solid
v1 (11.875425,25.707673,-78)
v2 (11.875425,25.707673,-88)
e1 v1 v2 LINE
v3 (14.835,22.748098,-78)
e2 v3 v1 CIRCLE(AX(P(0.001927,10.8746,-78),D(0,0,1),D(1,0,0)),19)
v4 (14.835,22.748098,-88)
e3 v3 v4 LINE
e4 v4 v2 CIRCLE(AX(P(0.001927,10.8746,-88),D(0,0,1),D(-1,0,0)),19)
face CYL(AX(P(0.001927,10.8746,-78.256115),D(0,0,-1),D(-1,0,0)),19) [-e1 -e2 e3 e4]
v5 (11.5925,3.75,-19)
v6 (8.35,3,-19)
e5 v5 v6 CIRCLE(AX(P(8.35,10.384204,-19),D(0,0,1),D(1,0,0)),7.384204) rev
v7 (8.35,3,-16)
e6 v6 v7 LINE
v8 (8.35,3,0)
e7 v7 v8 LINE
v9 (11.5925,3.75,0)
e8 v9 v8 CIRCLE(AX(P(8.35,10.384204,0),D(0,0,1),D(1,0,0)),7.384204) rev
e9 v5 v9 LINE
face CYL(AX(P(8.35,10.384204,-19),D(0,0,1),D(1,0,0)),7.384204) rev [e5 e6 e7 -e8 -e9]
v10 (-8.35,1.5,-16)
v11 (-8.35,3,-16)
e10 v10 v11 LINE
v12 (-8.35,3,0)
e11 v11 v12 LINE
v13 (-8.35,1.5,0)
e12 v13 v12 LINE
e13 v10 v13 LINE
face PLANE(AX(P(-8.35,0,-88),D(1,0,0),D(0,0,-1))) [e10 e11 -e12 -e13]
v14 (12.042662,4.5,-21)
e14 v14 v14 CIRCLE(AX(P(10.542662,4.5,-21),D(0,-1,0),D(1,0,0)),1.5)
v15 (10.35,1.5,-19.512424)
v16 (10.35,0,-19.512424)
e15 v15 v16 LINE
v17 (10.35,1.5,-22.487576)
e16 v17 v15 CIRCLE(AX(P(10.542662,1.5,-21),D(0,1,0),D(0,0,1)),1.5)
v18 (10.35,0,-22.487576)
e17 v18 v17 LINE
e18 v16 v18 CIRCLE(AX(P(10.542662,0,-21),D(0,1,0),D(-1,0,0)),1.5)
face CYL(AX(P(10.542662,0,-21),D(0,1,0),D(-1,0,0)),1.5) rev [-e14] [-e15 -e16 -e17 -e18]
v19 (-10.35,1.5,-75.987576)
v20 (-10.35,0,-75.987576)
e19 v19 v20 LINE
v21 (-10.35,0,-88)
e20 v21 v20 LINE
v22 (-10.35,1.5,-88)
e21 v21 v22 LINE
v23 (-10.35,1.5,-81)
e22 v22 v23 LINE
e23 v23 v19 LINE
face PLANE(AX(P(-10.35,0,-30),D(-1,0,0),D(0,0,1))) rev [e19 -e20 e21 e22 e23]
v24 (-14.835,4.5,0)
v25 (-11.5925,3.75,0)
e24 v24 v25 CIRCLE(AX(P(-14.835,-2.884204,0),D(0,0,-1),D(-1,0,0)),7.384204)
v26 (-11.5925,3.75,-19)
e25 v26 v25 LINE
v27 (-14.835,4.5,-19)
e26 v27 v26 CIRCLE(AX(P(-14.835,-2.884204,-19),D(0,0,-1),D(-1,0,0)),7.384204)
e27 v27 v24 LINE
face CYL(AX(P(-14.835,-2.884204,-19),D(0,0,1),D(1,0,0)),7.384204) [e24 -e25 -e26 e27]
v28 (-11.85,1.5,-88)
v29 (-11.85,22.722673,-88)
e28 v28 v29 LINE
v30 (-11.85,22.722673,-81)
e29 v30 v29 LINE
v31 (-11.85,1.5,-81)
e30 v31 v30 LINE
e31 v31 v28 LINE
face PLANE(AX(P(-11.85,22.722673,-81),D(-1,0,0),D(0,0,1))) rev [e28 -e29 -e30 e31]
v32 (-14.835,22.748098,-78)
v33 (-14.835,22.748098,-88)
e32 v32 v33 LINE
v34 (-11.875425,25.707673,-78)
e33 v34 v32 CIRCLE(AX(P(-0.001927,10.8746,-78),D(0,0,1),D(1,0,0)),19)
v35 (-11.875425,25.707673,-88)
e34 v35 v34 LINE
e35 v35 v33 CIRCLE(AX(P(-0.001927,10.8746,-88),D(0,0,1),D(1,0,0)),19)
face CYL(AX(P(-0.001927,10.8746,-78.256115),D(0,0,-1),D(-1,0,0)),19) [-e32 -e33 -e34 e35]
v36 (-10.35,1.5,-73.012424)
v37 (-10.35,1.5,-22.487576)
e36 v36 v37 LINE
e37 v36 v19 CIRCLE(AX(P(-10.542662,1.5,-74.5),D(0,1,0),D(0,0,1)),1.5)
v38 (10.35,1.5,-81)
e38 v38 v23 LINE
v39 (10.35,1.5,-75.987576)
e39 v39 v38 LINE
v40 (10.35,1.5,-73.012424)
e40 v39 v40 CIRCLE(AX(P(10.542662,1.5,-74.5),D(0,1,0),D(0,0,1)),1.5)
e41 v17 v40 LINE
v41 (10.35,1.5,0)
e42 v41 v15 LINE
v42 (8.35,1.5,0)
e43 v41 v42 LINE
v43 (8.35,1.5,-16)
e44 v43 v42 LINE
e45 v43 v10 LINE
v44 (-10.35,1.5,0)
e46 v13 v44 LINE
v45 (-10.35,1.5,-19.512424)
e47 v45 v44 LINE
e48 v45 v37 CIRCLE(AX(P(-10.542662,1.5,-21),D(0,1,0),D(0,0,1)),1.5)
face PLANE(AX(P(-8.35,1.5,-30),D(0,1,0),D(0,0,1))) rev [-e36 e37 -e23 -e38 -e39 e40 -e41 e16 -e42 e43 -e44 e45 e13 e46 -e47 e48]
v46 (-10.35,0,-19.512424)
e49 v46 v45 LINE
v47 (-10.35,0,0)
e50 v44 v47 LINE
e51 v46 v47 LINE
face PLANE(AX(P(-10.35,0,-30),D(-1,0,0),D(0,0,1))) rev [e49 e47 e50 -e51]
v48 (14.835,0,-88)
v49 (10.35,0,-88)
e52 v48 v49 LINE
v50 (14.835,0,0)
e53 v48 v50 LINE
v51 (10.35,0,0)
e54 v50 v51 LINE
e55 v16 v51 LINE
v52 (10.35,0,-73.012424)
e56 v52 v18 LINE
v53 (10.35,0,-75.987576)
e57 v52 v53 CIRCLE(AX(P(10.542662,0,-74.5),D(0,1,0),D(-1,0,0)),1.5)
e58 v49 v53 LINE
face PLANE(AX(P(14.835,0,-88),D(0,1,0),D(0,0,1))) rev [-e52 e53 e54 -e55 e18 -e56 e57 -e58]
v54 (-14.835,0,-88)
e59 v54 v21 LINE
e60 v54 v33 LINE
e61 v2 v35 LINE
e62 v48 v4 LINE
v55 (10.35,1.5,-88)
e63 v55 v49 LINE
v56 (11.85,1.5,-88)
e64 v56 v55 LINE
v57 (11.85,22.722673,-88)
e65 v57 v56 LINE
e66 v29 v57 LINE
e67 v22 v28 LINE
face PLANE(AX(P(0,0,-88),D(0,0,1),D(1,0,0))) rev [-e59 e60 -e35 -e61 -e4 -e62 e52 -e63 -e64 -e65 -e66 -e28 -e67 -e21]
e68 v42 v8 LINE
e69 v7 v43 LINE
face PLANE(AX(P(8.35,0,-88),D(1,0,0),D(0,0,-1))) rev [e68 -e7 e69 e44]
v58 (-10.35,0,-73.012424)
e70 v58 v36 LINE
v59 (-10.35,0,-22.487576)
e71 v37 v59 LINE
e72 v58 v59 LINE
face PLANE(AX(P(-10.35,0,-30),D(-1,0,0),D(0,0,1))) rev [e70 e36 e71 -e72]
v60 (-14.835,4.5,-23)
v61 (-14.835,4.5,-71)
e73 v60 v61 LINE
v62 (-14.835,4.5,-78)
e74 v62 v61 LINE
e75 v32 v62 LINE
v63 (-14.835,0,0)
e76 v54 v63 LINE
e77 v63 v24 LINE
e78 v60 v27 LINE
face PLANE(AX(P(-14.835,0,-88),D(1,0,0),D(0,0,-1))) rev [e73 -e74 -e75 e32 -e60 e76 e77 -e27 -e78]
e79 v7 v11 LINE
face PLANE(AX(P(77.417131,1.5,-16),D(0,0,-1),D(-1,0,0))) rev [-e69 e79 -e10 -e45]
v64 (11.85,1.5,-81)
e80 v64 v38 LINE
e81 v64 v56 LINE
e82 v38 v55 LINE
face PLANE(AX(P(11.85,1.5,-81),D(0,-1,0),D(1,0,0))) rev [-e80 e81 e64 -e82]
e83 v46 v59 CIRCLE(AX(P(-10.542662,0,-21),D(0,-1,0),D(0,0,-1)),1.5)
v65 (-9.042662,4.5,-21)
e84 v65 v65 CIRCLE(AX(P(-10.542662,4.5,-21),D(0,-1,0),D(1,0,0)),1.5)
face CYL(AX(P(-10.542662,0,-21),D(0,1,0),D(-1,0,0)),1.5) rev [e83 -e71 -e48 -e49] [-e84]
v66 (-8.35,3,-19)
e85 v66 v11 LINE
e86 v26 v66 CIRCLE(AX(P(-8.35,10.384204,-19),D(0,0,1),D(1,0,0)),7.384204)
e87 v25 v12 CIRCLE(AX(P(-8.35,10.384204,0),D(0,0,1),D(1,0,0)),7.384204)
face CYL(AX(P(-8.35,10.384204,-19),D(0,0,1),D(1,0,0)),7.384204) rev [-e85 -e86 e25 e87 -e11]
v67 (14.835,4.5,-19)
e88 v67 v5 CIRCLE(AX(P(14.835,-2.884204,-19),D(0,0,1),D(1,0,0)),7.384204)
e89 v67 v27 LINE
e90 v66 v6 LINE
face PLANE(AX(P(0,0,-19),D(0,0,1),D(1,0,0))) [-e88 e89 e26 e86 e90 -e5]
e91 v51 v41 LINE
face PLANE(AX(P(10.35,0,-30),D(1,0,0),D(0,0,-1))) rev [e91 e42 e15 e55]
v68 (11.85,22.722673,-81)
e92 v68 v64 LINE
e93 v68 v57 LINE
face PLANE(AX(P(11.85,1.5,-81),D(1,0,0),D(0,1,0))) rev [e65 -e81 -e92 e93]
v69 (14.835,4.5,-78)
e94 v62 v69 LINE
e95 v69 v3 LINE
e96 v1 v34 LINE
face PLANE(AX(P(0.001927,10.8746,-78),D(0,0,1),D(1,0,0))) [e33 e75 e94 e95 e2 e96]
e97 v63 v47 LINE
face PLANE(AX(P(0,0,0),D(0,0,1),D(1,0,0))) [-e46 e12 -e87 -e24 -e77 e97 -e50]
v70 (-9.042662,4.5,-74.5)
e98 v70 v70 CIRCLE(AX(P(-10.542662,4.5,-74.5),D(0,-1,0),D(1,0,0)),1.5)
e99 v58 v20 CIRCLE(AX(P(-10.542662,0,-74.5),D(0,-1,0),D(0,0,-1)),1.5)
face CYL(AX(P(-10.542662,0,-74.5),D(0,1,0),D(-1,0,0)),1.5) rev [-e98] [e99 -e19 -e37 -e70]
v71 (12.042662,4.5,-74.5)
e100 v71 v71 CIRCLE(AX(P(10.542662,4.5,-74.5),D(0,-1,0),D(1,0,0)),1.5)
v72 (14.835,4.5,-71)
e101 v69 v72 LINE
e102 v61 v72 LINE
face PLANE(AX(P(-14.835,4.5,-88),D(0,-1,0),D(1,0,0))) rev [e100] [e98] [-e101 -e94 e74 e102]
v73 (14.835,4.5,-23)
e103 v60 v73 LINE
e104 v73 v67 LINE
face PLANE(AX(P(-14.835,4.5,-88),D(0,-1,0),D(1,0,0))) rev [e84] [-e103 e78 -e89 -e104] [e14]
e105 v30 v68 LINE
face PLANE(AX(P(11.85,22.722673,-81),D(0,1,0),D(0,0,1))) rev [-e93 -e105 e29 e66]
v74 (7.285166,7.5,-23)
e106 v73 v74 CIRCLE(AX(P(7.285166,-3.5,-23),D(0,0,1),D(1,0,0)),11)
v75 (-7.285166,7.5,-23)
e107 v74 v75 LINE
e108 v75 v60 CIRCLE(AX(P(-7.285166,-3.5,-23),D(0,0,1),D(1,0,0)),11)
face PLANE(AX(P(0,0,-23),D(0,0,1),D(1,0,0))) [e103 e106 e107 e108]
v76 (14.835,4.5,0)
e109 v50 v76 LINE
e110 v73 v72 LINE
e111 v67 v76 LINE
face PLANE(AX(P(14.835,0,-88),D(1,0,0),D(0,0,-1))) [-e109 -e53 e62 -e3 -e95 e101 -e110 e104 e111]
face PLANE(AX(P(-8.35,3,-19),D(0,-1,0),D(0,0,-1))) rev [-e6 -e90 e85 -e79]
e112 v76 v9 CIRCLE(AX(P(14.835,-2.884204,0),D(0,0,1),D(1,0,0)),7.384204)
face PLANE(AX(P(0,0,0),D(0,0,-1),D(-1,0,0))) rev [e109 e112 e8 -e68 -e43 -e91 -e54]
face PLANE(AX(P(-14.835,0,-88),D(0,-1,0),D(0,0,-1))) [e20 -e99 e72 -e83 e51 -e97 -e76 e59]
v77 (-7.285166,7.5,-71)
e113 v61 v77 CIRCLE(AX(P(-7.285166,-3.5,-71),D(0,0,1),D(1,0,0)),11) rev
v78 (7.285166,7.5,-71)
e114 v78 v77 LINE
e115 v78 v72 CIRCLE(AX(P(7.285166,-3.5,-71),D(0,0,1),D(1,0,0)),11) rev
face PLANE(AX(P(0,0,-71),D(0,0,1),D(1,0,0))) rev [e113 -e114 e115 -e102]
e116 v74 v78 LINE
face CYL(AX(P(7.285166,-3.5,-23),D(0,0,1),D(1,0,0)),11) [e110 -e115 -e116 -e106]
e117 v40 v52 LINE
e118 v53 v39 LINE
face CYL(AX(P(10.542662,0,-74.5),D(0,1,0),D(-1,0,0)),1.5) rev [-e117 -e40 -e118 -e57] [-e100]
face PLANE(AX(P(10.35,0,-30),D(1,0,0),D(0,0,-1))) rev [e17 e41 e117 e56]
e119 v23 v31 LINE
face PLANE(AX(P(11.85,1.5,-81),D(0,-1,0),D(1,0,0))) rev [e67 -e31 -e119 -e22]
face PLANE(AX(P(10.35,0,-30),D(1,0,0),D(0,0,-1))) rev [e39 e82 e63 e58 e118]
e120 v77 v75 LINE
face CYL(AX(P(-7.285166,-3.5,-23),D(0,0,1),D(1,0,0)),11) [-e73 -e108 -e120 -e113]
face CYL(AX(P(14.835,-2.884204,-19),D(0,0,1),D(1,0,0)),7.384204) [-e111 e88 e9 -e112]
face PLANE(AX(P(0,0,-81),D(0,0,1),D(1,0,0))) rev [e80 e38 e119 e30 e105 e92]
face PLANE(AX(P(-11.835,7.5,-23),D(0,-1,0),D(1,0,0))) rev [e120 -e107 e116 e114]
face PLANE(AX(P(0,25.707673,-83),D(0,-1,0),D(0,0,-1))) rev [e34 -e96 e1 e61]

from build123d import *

# Parameters (mm, degrees)
SKETCH1_W               = 6.485
SKETCH1_H               = 4.5
BOSS_EXTRUDE1_DEPTH     = 88
BOSS_EXTRUDE1_2_DEPTH   = 88
SKETCH3_W               = 2
SKETCH3_H               = 1.5
CUT_EXTRUDE2_DEPTH      = 30
SKETCH4_W               = 2
SKETCH4_H               = 4.5
CUT_EXTRUDE3_DEPTH      = 65
BOSS_EXTRUDE2_REACH     = 93.644
SKETCH6_W               = 67
SKETCH6_H               = 3
BOSS_EXTRUDE3_DEPTH     = 5
CUT_EXTRUDE4_DEPTH      = 5
BOSS_EXTRUDE4_DEPTH     = 5
BOSS_EXTRUDE5_START     = 7
BOSS_EXTRUDE5_DEPTH     = 48
BOSS_EXTRUDE6_DEPTH     = 48
FILLET1_R               = 11
SKETCH15_W              = 23.7
SKETCH15_H              = 21.22267295
CUT_EXTRUDE6_DEPTH      = 7
SKETCH16_W              = 16.7
SKETCH16_H              = 1.5
CUT_EXTRUDE7_DEPTH      = 19
CUT_EXTRUDE5_DEPTH      = 92.727000479
CUT_EXTRUDE5_DEPTH_BACK = 92.727000479
SKETCH13_R              = 1.5


with BuildPart() as part:
    # Sketch1 → Boss-Extrude1 (new body)
    with BuildSketch(Plane.XY):
        with Locations((-11.5925, 2.25)):
            Rectangle(SKETCH1_W, SKETCH1_H)
    extrude(amount=-BOSS_EXTRUDE1_DEPTH)


with BuildPart() as body_2:
    # Sketch1 → Boss-Extrude1 2 (new body)
    with BuildSketch(Plane.XY):
        with Locations((11.5925, 2.25)):
            Rectangle(SKETCH1_W, SKETCH1_H)
    extrude(amount=-BOSS_EXTRUDE1_2_DEPTH)


with BuildPart() as cut_extrude2_tool:
    # Sketch3 → Cut-Extrude2 (new body)
    with BuildSketch(Plane.XY):
        with Locations((-9.35, 0.75)):
            Rectangle(SKETCH3_W, SKETCH3_H)
        with Locations((9.35, 0.75)):
            Rectangle(SKETCH3_W, SKETCH3_H)
    extrude(amount=-CUT_EXTRUDE2_DEPTH)


with BuildPart() as part_1:
    add(part.part)

    # Cut-Extrude2: cut by cut_extrude2_tool
    add(cut_extrude2_tool.part, mode=Mode.SUBTRACT)


with BuildPart() as body_2_1:
    add(body_2.part)

    # Cut-Extrude2: cut by cut_extrude2_tool
    add(cut_extrude2_tool.part, mode=Mode.SUBTRACT)


with BuildPart() as cut_extrude3_tool:
    # Sketch4 → Cut-Extrude3 (new body)
    with BuildSketch(Plane(origin=(0, 0, -88), x_dir=(-1, 0, 0), z_dir=(0, 0, -1))):
        with Locations((9.35, 2.25)):
            Rectangle(SKETCH4_W, SKETCH4_H)
        with Locations((-9.35, 2.25)):
            Rectangle(SKETCH4_W, SKETCH4_H)
    extrude(amount=-CUT_EXTRUDE3_DEPTH)


with BuildPart() as part_2:
    add(part_1.part)

    # Cut-Extrude3: cut by cut_extrude3_tool
    add(cut_extrude3_tool.part, mode=Mode.SUBTRACT)


with BuildPart() as body_2_2:
    add(body_2_1.part)

    # Cut-Extrude3: cut by cut_extrude3_tool
    add(cut_extrude3_tool.part, mode=Mode.SUBTRACT)

    # Boss-Extrude2: up to this face of the body (flat: up to its plane)
    boss_extrude2_end = Plane(body_2_2.part.faces().sort_by_distance((10.35, 2.091743119, -50.857798165))[0])
    # Sketch6 → Boss-Extrude2 (add, up to the picked face)
    with BuildSketch(Plane(origin=(-10.35, 0, 0), x_dir=(0, 0, -1), z_dir=(1, 0, 0)), mode=Mode.PRIVATE) as boss_extrude2_sk1:
        with Locations((49.5, 3)):
            Rectangle(SKETCH6_W, SKETCH6_H)
    boss_extrude2_tool1 = split(extrude(boss_extrude2_sk1.sketch, amount=BOSS_EXTRUDE2_REACH, mode=Mode.PRIVATE), bisect_by=boss_extrude2_end, keep=Keep.BOTH, mode=Mode.PRIVATE)

    add(part_2.part)  # Boss-Extrude2 merges part
    add(boss_extrude2_tool1.solids().sort_by(Axis((-10.35, 3, -49.5), (1, 0, 0)))[0])

    # Sketch8 → Boss-Extrude3 (add)
    with BuildSketch(Plane(origin=(0, 0, -88), x_dir=(-1, 0, 0), z_dir=(0, 0, -1))):
        Polygon((-14.835, 25.70767295), (-14.835, 4.5), (-10.35, 4.5), (-10.35, 21.22267295), (10.35, 21.22267295), (10.35, 4.5), (14.835, 4.5), (14.835, 25.70767295), align=None)
    extrude(amount=-BOSS_EXTRUDE3_DEPTH)

    # Sketch9 → Cut-Extrude4 (cut)
    with BuildSketch(Plane(origin=(0, 0, -88), x_dir=(-1, 0, 0), z_dir=(0, 0, -1))):
        with BuildLine():
            Line((-15.009070225, 25.881743175), (-15.009070225, 22.527310239))
            ThreePointArc((-15.009070225, 22.527310239), (-13.436955933, 24.309628883), (-11.654637289, 25.881743175))
            Line((-11.654637289, 25.881743175), (-15.009070225, 25.881743175))
        make_face()
        with BuildLine():
            Line((15.009070225, 25.881743175), (15.009070225, 22.527310239))
            ThreePointArc((15.009070225, 22.527310239), (13.436955933, 24.309628883), (11.654637289, 25.881743175))
            Line((11.654637289, 25.881743175), (15.009070225, 25.881743175))
        make_face()
    extrude(amount=-CUT_EXTRUDE4_DEPTH, mode=Mode.SUBTRACT)

    # Sketch11 → Boss-Extrude4 (add)
    with BuildSketch(Plane.XY.offset(-83)):
        with BuildLine():
            Line((14.835, 4.5), (14.835, 22.748097759))
            ThreePointArc((14.835, 22.748097759), (13.436955933, 24.309628883), (11.875424809, 25.70767295))
            Line((11.875424809, 25.70767295), (-11.875424809, 25.70767295))
            ThreePointArc((-11.875424809, 25.70767295), (-13.436955933, 24.309628883), (-14.835, 22.748097759))
            Line((-14.835, 22.748097759), (-14.835, 4.5))
            Line((-14.835, 4.5), (14.835, 4.5))
        make_face()
    extrude(amount=BOSS_EXTRUDE4_DEPTH)

    # Sketch12 → Boss-Extrude5 (add)
    with BuildSketch(Plane.XY.offset(-78).offset(BOSS_EXTRUDE5_START)):
        Polygon((-14.835, 4.5), (-11.835, 7.5), (11.835, 7.5), (14.835, 4.5), align=None)
    extrude(amount=BOSS_EXTRUDE5_DEPTH)

    # Sketch14 → Boss-Extrude6 (add)
    with BuildSketch(Plane.XY.offset(-23)):
        Polygon((-11.835, 7.5), (-14.835, 4.5), (-10.835, 4.5), (-10.835, 7.5), align=None)
        Polygon((11.835, 7.5), (14.835, 4.5), (10.835, 4.5), (10.835, 7.5), align=None)
    extrude(amount=-BOSS_EXTRUDE6_DEPTH)

    # Fillet1
    # the kernel refuses this fillet: 11 mm, written as the material it takes off along each edge
    with BuildSketch(Plane(origin=(11.835, 7.5, -82.374586088), x_dir=(-1, 0, 0), z_dir=(0, 0, 1))) as fillet1_piece_1_section:
        with BuildLine():
            CenterArc((4.549834435, 11), FILLET1_R, 226.658241773, 43.341758227)
            Line((-3, 3), (0, 0))
            Line((0, 0), (4.549834435, 0))
        make_face()
    fillet1_piece_1 = extrude(amount=70.749172176, mode=Mode.PRIVATE)
    fillet1_piece_1 = split(fillet1_piece_1, bisect_by=Plane(origin=(11.355308805, 6.742969198, -78), z_dir=(0, 0, 1)), keep=Keep.TOP, mode=Mode.PRIVATE)
    add(fillet1_piece_1, mode=Mode.SUBTRACT)
    with BuildSketch(Plane(origin=(-11.835, 7.5, -82.374586088), x_dir=(1, 0, 0), z_dir=(0, 0, 1))) as fillet1_piece_2_section:
        with BuildLine():
            CenterArc((4.549834435, -11), FILLET1_R, 90, 43.341758227)
            Line((-3, -3), (0, 0))
            Line((0, 0), (4.549834435, 0))
        make_face()
    fillet1_piece_2 = extrude(amount=70.749172176, mode=Mode.PRIVATE)
    fillet1_piece_2 = split(fillet1_piece_2, bisect_by=Plane(origin=(-11.355308805, 6.742969198, -78), z_dir=(0, 0, 1)), keep=Keep.TOP, mode=Mode.PRIVATE)
    add(fillet1_piece_2, mode=Mode.SUBTRACT)

    # Sketch15 → Cut-Extrude6 (cut)
    with BuildSketch(Plane(origin=(0, 0, -88), x_dir=(-1, 0, 0), z_dir=(0, 0, -1))):
        with Locations((0, 12.111336475)):
            Rectangle(SKETCH15_W, SKETCH15_H)
    extrude(amount=-CUT_EXTRUDE6_DEPTH, mode=Mode.SUBTRACT)

    # Sketch16 → Cut-Extrude7 (cut)
    with BuildSketch(Plane.XY):
        with BuildLine():
            ThreePointArc((11.5925, 3.75), (10.014054255, 3.189942939), (8.35, 3))
            Line((8.35, 3), (8.35, 4.5))
            Line((8.35, 4.5), (14.835, 4.5))
            ThreePointArc((14.835, 4.5), (13.170945745, 4.310057061), (11.5925, 3.75))
        make_face()
        with BuildLine():
            ThreePointArc((-11.5925, 3.75), (-10.014054255, 3.189942939), (-8.35, 3))
            Line((-8.35, 3), (-8.35, 4.5))
            Line((-8.35, 4.5), (-14.835, 4.5))
            ThreePointArc((-14.835, 4.5), (-13.170945745, 4.310057061), (-11.5925, 3.75))
        make_face()
        with Locations((0, 3.75)):
            Rectangle(SKETCH16_W, SKETCH16_H)
    extrude(amount=-CUT_EXTRUDE7_DEPTH, mode=Mode.SUBTRACT)

    # Sketch13 → Cut-Extrude5 (cut, two sides: drawn at the far end of the back side and taken through both)
    with BuildSketch(Plane(origin=(0, 4.5, 0), x_dir=(1, 0, 0), z_dir=(0, 1, 0)).offset(-CUT_EXTRUDE5_DEPTH_BACK)):
        with Locations(Location((10.542662348, 74.5, 0), (0, 0, 97.379545614))):
            Circle(SKETCH13_R)
        with Locations(Location((-10.542662348, 74.5, 0), (0, 0, 277.379545614))):
            Circle(SKETCH13_R)
        with Locations(Location((10.542662348, 21, 0), (0, 0, 97.379545614))):
            Circle(SKETCH13_R)
        with Locations(Location((-10.542662348, 21, 0), (0, 0, 277.379545614))):
            Circle(SKETCH13_R)
    extrude(amount=CUT_EXTRUDE5_DEPTH + CUT_EXTRUDE5_DEPTH_BACK, mode=Mode.SUBTRACT)


solid = body_2_2.part
